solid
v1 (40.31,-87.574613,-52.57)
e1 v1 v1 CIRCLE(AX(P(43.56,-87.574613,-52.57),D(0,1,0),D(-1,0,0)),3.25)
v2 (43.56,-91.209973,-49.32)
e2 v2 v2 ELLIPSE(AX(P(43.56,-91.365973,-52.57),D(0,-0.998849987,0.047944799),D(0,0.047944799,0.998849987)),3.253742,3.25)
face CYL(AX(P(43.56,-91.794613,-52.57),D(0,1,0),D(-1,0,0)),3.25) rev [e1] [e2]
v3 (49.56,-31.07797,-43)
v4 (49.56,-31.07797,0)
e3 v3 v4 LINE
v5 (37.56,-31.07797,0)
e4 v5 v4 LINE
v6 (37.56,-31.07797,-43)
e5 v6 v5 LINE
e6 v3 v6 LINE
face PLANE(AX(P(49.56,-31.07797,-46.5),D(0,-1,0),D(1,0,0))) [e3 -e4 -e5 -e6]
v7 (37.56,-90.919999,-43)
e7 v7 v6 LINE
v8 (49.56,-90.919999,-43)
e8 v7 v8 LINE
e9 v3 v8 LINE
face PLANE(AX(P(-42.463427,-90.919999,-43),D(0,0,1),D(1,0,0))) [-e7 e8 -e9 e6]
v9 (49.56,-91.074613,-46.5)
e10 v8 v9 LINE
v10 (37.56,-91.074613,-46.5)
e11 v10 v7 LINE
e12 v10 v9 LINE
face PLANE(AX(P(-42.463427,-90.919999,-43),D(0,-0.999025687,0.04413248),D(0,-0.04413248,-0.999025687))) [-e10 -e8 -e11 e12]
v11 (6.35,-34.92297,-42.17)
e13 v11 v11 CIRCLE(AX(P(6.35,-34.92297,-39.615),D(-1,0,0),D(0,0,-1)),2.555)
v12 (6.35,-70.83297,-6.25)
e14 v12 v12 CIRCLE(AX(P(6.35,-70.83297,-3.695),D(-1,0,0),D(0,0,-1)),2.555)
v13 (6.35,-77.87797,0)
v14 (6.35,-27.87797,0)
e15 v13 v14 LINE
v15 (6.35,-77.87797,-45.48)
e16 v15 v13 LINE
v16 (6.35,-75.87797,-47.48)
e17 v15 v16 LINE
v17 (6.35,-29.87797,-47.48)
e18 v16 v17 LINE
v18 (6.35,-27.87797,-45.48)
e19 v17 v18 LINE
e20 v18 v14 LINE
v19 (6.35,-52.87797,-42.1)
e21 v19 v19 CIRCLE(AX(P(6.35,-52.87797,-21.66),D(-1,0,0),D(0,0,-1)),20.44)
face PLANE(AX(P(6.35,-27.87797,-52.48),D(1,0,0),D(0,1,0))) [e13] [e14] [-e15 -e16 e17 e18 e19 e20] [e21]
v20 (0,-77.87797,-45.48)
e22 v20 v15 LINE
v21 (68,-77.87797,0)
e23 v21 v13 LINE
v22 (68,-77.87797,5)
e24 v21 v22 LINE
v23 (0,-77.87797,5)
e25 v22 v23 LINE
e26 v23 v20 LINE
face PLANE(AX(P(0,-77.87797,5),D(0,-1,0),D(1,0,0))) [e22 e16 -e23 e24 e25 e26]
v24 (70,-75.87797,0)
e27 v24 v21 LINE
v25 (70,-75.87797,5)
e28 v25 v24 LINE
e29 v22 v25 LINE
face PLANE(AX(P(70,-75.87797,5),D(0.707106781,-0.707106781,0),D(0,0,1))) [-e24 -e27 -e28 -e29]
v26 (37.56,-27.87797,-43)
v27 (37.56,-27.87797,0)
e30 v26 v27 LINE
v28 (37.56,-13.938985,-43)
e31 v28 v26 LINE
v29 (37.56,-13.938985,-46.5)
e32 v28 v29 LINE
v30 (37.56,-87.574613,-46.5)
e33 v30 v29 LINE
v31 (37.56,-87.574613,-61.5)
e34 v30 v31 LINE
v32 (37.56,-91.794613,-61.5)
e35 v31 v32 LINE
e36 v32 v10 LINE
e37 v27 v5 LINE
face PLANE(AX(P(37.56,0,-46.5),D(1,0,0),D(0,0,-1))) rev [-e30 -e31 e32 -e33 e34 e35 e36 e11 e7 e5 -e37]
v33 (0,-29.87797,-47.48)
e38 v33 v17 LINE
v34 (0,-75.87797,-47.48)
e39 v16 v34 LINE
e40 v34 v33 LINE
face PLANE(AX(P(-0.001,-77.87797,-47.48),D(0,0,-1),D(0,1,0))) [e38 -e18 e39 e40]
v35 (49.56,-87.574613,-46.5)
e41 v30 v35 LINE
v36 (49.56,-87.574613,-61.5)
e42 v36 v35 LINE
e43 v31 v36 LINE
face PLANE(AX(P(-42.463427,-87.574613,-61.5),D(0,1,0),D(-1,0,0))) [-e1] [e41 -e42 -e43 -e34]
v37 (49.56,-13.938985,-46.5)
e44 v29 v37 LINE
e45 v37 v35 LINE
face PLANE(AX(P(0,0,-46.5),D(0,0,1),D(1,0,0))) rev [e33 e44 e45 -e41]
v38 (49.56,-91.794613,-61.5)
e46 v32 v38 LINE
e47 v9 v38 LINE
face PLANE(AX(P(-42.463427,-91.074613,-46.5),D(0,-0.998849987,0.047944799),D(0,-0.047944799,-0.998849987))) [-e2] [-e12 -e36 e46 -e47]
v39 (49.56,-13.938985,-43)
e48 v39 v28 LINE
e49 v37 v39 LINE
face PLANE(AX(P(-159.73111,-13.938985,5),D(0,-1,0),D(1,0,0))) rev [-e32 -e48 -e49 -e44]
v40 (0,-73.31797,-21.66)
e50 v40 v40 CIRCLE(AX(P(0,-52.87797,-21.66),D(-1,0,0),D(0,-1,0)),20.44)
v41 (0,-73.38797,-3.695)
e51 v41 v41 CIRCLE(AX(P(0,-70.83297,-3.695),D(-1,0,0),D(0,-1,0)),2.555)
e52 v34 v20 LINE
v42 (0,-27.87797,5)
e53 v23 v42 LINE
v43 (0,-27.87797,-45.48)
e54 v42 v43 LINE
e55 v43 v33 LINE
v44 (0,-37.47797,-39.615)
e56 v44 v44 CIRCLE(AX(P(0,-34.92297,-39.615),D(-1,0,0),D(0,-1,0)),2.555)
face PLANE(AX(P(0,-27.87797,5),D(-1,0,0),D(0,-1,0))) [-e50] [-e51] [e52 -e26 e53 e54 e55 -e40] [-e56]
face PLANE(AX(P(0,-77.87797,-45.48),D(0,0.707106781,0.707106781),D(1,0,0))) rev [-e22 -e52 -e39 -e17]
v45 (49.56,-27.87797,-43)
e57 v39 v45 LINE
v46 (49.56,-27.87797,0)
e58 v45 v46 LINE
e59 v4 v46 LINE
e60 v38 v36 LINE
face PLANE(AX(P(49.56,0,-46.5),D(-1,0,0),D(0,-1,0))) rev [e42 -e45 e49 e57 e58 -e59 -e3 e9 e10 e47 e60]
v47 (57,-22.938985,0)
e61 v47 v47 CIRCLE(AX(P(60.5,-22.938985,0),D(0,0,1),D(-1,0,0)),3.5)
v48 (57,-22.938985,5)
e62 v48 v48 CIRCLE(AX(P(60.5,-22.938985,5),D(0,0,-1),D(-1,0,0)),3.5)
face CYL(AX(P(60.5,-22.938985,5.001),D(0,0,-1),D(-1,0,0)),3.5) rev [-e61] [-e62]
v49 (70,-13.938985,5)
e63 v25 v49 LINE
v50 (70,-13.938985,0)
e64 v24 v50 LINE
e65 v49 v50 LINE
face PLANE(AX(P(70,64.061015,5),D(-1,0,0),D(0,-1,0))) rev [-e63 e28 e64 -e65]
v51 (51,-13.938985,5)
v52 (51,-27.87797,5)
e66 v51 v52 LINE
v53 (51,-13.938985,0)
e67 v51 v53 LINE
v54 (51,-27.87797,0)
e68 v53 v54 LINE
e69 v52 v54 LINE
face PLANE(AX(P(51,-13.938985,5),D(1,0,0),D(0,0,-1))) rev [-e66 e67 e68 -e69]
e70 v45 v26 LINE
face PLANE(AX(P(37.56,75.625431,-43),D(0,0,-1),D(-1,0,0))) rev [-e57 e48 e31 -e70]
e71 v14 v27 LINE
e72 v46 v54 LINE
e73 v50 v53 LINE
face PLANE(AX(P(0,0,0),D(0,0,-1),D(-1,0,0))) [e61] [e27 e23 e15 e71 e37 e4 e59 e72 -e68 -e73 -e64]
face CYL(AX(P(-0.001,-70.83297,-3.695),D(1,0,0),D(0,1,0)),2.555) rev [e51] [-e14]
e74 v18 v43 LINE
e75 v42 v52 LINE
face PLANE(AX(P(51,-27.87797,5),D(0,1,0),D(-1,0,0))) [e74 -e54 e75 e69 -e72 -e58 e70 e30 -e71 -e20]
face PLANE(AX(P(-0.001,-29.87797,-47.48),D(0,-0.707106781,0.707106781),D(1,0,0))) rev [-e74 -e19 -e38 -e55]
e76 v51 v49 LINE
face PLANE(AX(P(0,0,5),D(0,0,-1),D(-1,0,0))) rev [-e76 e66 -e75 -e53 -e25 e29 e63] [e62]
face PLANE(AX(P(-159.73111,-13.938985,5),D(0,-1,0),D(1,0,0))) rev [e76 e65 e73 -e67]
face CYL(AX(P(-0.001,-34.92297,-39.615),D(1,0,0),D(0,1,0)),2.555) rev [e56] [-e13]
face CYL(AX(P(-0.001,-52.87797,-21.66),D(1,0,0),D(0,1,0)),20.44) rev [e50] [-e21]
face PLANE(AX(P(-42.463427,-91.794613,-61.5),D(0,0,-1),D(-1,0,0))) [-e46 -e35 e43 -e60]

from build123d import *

# Parameters (mm, degrees)
BOSS_EXTRUDE1_DEPTH   = 5
SKETCH2_W             = 6.35
SKETCH2_H             = 50
BOSS_EXTRUDE2_DEPTH   = 52.48
CUT_EXTRUDE1_REACH    = 106.448
SKETCH3_R             = 20.44
SKETCH3_R_2           = 2.555
SKETCH3_W             = 5
SKETCH3_H             = 50
CUT_EXTRUDE2_REACH    = 108.104
SKETCH4_R             = 3.5
CUT_EXTRUDE6_REACH    = 108.104
SKETCH14_W            = 23.196263878
SKETCH14_H            = 15.316152196
SKETCH15_W            = 12
SKETCH15_H            = 3.2
BOSS_EXTRUDE7_DEPTH   = 46.5
BOSS_EXTRUDE8_REACH   = 98.667
SKETCH16_W            = 12
SKETCH16_H            = 3.5
SKETCH17_W            = 12
SKETCH17_H            = 3.5
BOSS_EXTRUDE9_DEPTH   = 15
CHAMFER2_SIZE         = 2
SKETCH22_W            = 12
SKETCH22_H            = 15
BOSS_EXTRUDE10_DEPTH  = 0.72
CUT_EXTRUDE8_REACH    = 103.606
CUT_EXTRUDE7_REACH    = 120.762
SKETCH18_R            = 3.25
MIRROR2_OUTLINE_W     = 50
MIRROR2_OUTLINE_H     = 5
MIRROR2_DEPTH         = 68
MIRROR2_2_OUTLINE_R   = 2.555
MIRROR2_2_OUTLINE_R_2 = 20.44
MIRROR2_2_DEPTH       = 6.35
MIRROR2_START         = 37.56
MIRROR2_3_DEPTH       = 12
MIRROR2_START_2       = 51
MIRROR2_4_OUTLINE_W   = 13.938985111
MIRROR2_4_OUTLINE_H   = 5
MIRROR2_4_DEPTH       = 5.9999999
MIRROR2_START_3       = 64.0000001
MIRROR2_5_OUTLINE_W   = 13.938985111
MIRROR2_5_OUTLINE_H   = 5
MIRROR2_5_DEPTH       = 5.9999999
MIRROR2_6_DEPTH       = 5
BOSS_EXTRUDE11_DEPTH  = 12
CUT_EXTRUDE9_REACH    = 132.799
SKETCH26_W            = 121.241742099
SKETCH26_H            = 103.992632166
SKETCH27_R            = 3.25
CUT_EXTRUDE10_DEPTH   = 119.762181294


with BuildPart() as part:
    # Sketch1 → Boss-Extrude1 (new body)
    with BuildSketch(Plane.XY):
        Polygon((0, 0), (0, 50), (51, 50), (51, 64.061014889), (70, 64.061014889), (70, -13.938985111), (51, -13.938985111), (51, 0), align=None)
    extrude(amount=BOSS_EXTRUDE1_DEPTH)

    # Sketch2 → Boss-Extrude2 (add)
    with BuildSketch(Plane(origin=(0, 0, 0), x_dir=(-1, 0, 0), z_dir=(0, 0, -1))):
        with Locations((-3.175, 25)):
            Rectangle(SKETCH2_W, SKETCH2_H)
    extrude(amount=BOSS_EXTRUDE2_DEPTH)

    # Sketch3 → Cut-Extrude1 (cut, up to next)
    with BuildSketch(Plane(origin=(6.35, 0, 0), x_dir=(0, 0, -1), z_dir=(1, 0, 0)), mode=Mode.PRIVATE) as cut_extrude1_sk1:
        with Locations((21.66, 25)):
            Circle(SKETCH3_R)
    cut_extrude1_tool1 = extrude(cut_extrude1_sk1.sketch, amount=-CUT_EXTRUDE1_REACH, mode=Mode.PRIVATE) & part.part
    # Sketch3 → Cut-Extrude1 (cut, up to next)
    with BuildSketch(Plane(origin=(6.35, 0, 0), x_dir=(0, 0, -1), z_dir=(1, 0, 0)), mode=Mode.PRIVATE) as cut_extrude1_sk2:
        with Locations((3.695, 42.955)):
            Circle(SKETCH3_R_2)
    cut_extrude1_tool2 = extrude(cut_extrude1_sk2.sketch, amount=-CUT_EXTRUDE1_REACH, mode=Mode.PRIVATE) & part.part
    # Sketch3 → Cut-Extrude1 (cut, up to next)
    with BuildSketch(Plane(origin=(6.35, 0, 0), x_dir=(0, 0, -1), z_dir=(1, 0, 0)), mode=Mode.PRIVATE) as cut_extrude1_sk3:
        with Locations((39.615, 7.045)):
            Circle(SKETCH3_R_2)
    cut_extrude1_tool3 = extrude(cut_extrude1_sk3.sketch, amount=-CUT_EXTRUDE1_REACH, mode=Mode.PRIVATE) & part.part
    # Sketch3 → Cut-Extrude1 (cut, up to next)
    with BuildSketch(Plane(origin=(6.35, 0, 0), x_dir=(0, 0, -1), z_dir=(1, 0, 0)), mode=Mode.PRIVATE) as cut_extrude1_sk4:
        with Locations((49.98, 25)):
            Rectangle(SKETCH3_W, SKETCH3_H)
    cut_extrude1_tool4 = extrude(cut_extrude1_sk4.sketch, amount=-CUT_EXTRUDE1_REACH, mode=Mode.PRIVATE) & part.part
    add(cut_extrude1_tool1.solids().sort_by_distance((6.35, 25, -21.66))[0], mode=Mode.SUBTRACT)
    add(cut_extrude1_tool2.solids().sort_by_distance((6.35, 42.955, -3.695))[0], mode=Mode.SUBTRACT)
    add(cut_extrude1_tool3.solids().sort_by_distance((6.35, 7.045, -39.615))[0], mode=Mode.SUBTRACT)
    add(cut_extrude1_tool4.solids().sort_by_distance((6.35, 25, -49.98))[0], mode=Mode.SUBTRACT)

    # Sketch4 → Cut-Extrude2 (cut, up to next)
    with BuildSketch(Plane(origin=(0, 0, 0), x_dir=(-1, 0, 0), z_dir=(0, 0, -1)), mode=Mode.PRIVATE) as cut_extrude2_sk1:
        with Locations((-60.5, 55.061014889)):
            Circle(SKETCH4_R)
    cut_extrude2_tool1 = extrude(cut_extrude2_sk1.sketch, amount=-CUT_EXTRUDE2_REACH, mode=Mode.PRIVATE) & part.part
    # Sketch4 → Cut-Extrude2 (cut, up to next)
    with BuildSketch(Plane(origin=(0, 0, 0), x_dir=(-1, 0, 0), z_dir=(0, 0, -1)), mode=Mode.PRIVATE) as cut_extrude2_sk2:
        with Locations((-60.5, -4.938985111)):
            Circle(SKETCH4_R)
    cut_extrude2_tool2 = extrude(cut_extrude2_sk2.sketch, amount=-CUT_EXTRUDE2_REACH, mode=Mode.PRIVATE) & part.part
    add(cut_extrude2_tool1.solids().sort_by_distance((60.5, 55.061015, 0))[0], mode=Mode.SUBTRACT)
    add(cut_extrude2_tool2.solids().sort_by_distance((60.5, -4.938985, 0))[0], mode=Mode.SUBTRACT)

    # Sketch14 → Cut-Extrude6 (cut, up to next)
    with BuildSketch(Plane(origin=(0, 0, 0), x_dir=(-1, 0, 0), z_dir=(0, 0, -1)), mode=Mode.PRIVATE) as cut_extrude6_sk1:
        with Locations((-62.598131939, 57.658076098)):
            Rectangle(SKETCH14_W, SKETCH14_H)
    cut_extrude6_tool1 = extrude(cut_extrude6_sk1.sketch, amount=-CUT_EXTRUDE6_REACH, mode=Mode.PRIVATE) & part.part
    add(cut_extrude6_tool1.solids().sort_by_distance((62.598132, 57.658076, 0))[0], mode=Mode.SUBTRACT)

    # Sketch15 → Boss-Extrude7 (add)
    with BuildSketch(Plane(origin=(0, 0, 0), x_dir=(-1, 0, 0), z_dir=(0, 0, -1))):
        with Locations((-43.56, 1.6)):
            Rectangle(SKETCH15_W, SKETCH15_H)
    extrude(amount=BOSS_EXTRUDE7_DEPTH)

    # Boss-Extrude8: up to this plane
    boss_extrude8_end = Plane(origin=(166.832994776, 64.085435133, -66.619565524), z_dir=(-1.1416993347548052e-15, 0.9990256874715413, 0.04413247978546202))
    # Sketch16 → Boss-Extrude8 (add, up to the surface)
    with BuildSketch(Plane(origin=(0, 3.2, 0), x_dir=(1, 0, 0), z_dir=(0, 1, 0)), mode=Mode.PRIVATE) as boss_extrude8_sk1:
        with Locations((43.56, 44.75)):
            Rectangle(SKETCH16_W, SKETCH16_H)
    boss_extrude8_tool1 = split(extrude(boss_extrude8_sk1.sketch, amount=BOSS_EXTRUDE8_REACH, mode=Mode.PRIVATE), bisect_by=boss_extrude8_end, keep=Keep.BOTH, mode=Mode.PRIVATE)
    add(boss_extrude8_tool1.solids().sort_by_distance((43.56, 3.2, -44.75))[0])

    # Sketch17 → Boss-Extrude9 (add)
    with BuildSketch(Plane(origin=(0, 0, -46.5), x_dir=(-1, 0, 0), z_dir=(0, 0, -1))):
        with Locations((-43.56, 61.446642853)):
            Rectangle(SKETCH17_W, SKETCH17_H)
    extrude(amount=BOSS_EXTRUDE9_DEPTH)

    # Chamfer2
    chamfer2_edges = [part.edges().sort_by_distance(p)[0] for p in [
        (3.175, 0, -47.48),
        (3.175, 50, -47.48),
        (70, 50, 2.5),
    ]]
    chamfer(chamfer2_edges, length=CHAMFER2_SIZE)

    # Sketch22 → Boss-Extrude10 (add)
    with BuildSketch(Plane(origin=(0, 63.196642853, 0), x_dir=(1, 0, 0), z_dir=(0, 1, 0))):
        with Locations((43.56, 54)):
            Rectangle(SKETCH22_W, SKETCH22_H)
    extrude(amount=BOSS_EXTRUDE10_DEPTH)

    # Sketch23 → Cut-Extrude8 (cut, up to next)
    with BuildSketch(Plane(origin=(49.56, 0, 0), x_dir=(0, 0, -1), z_dir=(1, 0, 0)), mode=Mode.PRIVATE) as cut_extrude8_sk1:
        Polygon((46.5, 63.916642853), (46.5, 63.196642853), (61.5, 63.916642853), align=None)
    cut_extrude8_tool1 = extrude(cut_extrude8_sk1.sketch, amount=-CUT_EXTRUDE8_REACH, mode=Mode.PRIVATE) & part.part
    add(cut_extrude8_tool1.solids().sort_by_distance((49.56, 63.676643, -51.5))[0], mode=Mode.SUBTRACT)

    # Cut-Extrude7: up to this plane
    cut_extrude7_end = Plane(origin=(-0.001, 63.196642853, -46.5), z_dir=(-2.1659106514416256e-15, -0.9988499868416298, -0.04794479936839813))
    # Sketch18 → Cut-Extrude7 (cut, up to the surface)
    with BuildSketch(Plane.XZ.offset(-59.696642853), mode=Mode.PRIVATE) as cut_extrude7_sk1:
        with Locations(Location((43.56, -52.57, 0), (0, 0, 270))):
            Circle(SKETCH18_R)
    cut_extrude7_tool1 = split(extrude(cut_extrude7_sk1.sketch, amount=-CUT_EXTRUDE7_REACH, mode=Mode.PRIVATE), bisect_by=cut_extrude7_end, keep=Keep.BOTH, mode=Mode.PRIVATE)
    add(cut_extrude7_tool1.solids().sort_by_distance((43.56, 59.696643, -52.57))[0], mode=Mode.SUBTRACT)



with BuildPart() as body_2:
    # Mirror2: read off the stored shape, not the designer's step
    # Mirror2 outline → Mirror2 (new body)
    with BuildSketch(Plane.YZ):
        with Locations((-52.877970222, 2.5)):
            Rectangle(MIRROR2_OUTLINE_W, MIRROR2_OUTLINE_H)
    extrude(amount=MIRROR2_DEPTH)

    # Mirror2 2 outline → Mirror2 2 (add)
    with BuildSketch(Plane.YZ):
        Polygon((-27.877970222, -45.48), (-27.877970222, 0), (-77.877970222, 0), (-77.877970222, -45.48), (-75.877970222, -47.48), (-29.877970222, -47.48), align=None)
        with Locations((-34.922970222, -39.615)):
            Circle(MIRROR2_2_OUTLINE_R, mode=Mode.SUBTRACT)
        with Locations((-70.832970222, -3.695)):
            Circle(MIRROR2_2_OUTLINE_R, mode=Mode.SUBTRACT)
        with Locations((-52.877970222, -21.66)):
            Circle(MIRROR2_2_OUTLINE_R_2, mode=Mode.SUBTRACT)
    extrude(amount=MIRROR2_2_DEPTH)


with BuildPart() as part_1:
    add(part.part)

    add(body_2.part)  # Mirror2 3 merges body 2
    # Mirror2 3 outline → Mirror2 3 (add)
    with BuildSketch(Plane.YZ.offset(MIRROR2_START)):
        Polygon((-31.077970222, -46.5), (0, -46.5), (0, -43), (-27.877970222, -43), (-27.877970222, 0), (-31.077970222, 0), align=None)
    extrude(amount=MIRROR2_3_DEPTH)

    # Mirror2 4 outline → Mirror2 4 (add)
    with BuildSketch(Plane.YZ.offset(MIRROR2_START_2)):
        with Locations((-20.908477667, 2.5)):
            Rectangle(MIRROR2_4_OUTLINE_W, MIRROR2_4_OUTLINE_H)
    extrude(amount=MIRROR2_4_DEPTH)

    # Mirror2 5 outline → Mirror2 5 (add)
    with BuildSketch(Plane.YZ.offset(MIRROR2_START_3)):
        with Locations((-20.908477667, 2.5)):
            Rectangle(MIRROR2_5_OUTLINE_W, MIRROR2_5_OUTLINE_H)
    extrude(amount=MIRROR2_5_DEPTH)

    # Mirror2 6 outline → Mirror2 6 (add)
    with BuildSketch(Plane.XY):
        Polygon((70, -75.877970222), (70, -27.877970222), (68, -27.877970222), (68, -77.877970222), align=None)
        with BuildLine():
            Line((64.0000001, -27.877970222), (64, -22.938985111))
            ThreePointArc((64, -22.938985111), (60.5, -26.438985111), (57, -22.938985111))
            Line((57, -22.938985111), (56.9999999, -27.877970222))
            Line((56.9999999, -27.877970222), (64.0000001, -27.877970222))
        make_face()
        with BuildLine():
            ThreePointArc((57, -22.938985111), (60.5, -19.438985111), (64, -22.938985111))
            Line((64, -22.938985111), (64.0000001, -13.938985111))
            Line((64.0000001, -13.938985111), (56.9999999, -13.938985111))
            Line((56.9999999, -13.938985111), (57, -22.938985111))
        make_face()
    extrude(amount=MIRROR2_6_DEPTH)

    # Sketch25 → Boss-Extrude11 (add)
    with BuildSketch(Plane(origin=(49.56, 0, 0), x_dir=(0, 0, -1), z_dir=(1, 0, 0))):
        Polygon((43, -13.938985111), (46.5, -13.938985111), (46.5, -87.574613075), (61.5, -87.574613075), (61.5, -91.794613075), (46.5, -91.074613075), (43, -90.919998753), (43, -31.077970222), align=None)
    extrude(amount=-BOSS_EXTRUDE11_DEPTH)

    # Cut-Extrude9: up to this face of the body (flat: up to its plane)
    cut_extrude9_end = Plane(part_1.part.faces().sort_by_distance((0, 0.724855186, -20.24))[0])
    # Sketch26 → Cut-Extrude9 (cut, up to the picked face)
    with BuildSketch(Plane(origin=(70, 0, 0), x_dir=(0, 0, -1), z_dir=(1, 0, 0)), mode=Mode.PRIVATE) as cut_extrude9_sk1:
        with Locations((55.62087105, 38.057330972)):
            Rectangle(SKETCH26_W, SKETCH26_H)
    cut_extrude9_tool1 = split(extrude(cut_extrude9_sk1.sketch, amount=-CUT_EXTRUDE9_REACH, mode=Mode.PRIVATE), bisect_by=cut_extrude9_end, keep=Keep.BOTH, mode=Mode.PRIVATE)
    add(cut_extrude9_tool1.solids().sort_by(Axis((70, 38.057331, -55.620871), (-1, 0, 0)))[0], mode=Mode.SUBTRACT)

    # Sketch27 → Cut-Extrude10 (cut, through all)
    with BuildSketch(Plane(origin=(0, -87.574613075, 0), x_dir=(1, 0, 0), z_dir=(0, 1, 0))):
        with Locations(Location((43.56, 52.57, 0), (0, 0, 180))):
            Circle(SKETCH27_R)
    extrude(amount=-CUT_EXTRUDE10_DEPTH, mode=Mode.SUBTRACT)


solid = part_1.part
